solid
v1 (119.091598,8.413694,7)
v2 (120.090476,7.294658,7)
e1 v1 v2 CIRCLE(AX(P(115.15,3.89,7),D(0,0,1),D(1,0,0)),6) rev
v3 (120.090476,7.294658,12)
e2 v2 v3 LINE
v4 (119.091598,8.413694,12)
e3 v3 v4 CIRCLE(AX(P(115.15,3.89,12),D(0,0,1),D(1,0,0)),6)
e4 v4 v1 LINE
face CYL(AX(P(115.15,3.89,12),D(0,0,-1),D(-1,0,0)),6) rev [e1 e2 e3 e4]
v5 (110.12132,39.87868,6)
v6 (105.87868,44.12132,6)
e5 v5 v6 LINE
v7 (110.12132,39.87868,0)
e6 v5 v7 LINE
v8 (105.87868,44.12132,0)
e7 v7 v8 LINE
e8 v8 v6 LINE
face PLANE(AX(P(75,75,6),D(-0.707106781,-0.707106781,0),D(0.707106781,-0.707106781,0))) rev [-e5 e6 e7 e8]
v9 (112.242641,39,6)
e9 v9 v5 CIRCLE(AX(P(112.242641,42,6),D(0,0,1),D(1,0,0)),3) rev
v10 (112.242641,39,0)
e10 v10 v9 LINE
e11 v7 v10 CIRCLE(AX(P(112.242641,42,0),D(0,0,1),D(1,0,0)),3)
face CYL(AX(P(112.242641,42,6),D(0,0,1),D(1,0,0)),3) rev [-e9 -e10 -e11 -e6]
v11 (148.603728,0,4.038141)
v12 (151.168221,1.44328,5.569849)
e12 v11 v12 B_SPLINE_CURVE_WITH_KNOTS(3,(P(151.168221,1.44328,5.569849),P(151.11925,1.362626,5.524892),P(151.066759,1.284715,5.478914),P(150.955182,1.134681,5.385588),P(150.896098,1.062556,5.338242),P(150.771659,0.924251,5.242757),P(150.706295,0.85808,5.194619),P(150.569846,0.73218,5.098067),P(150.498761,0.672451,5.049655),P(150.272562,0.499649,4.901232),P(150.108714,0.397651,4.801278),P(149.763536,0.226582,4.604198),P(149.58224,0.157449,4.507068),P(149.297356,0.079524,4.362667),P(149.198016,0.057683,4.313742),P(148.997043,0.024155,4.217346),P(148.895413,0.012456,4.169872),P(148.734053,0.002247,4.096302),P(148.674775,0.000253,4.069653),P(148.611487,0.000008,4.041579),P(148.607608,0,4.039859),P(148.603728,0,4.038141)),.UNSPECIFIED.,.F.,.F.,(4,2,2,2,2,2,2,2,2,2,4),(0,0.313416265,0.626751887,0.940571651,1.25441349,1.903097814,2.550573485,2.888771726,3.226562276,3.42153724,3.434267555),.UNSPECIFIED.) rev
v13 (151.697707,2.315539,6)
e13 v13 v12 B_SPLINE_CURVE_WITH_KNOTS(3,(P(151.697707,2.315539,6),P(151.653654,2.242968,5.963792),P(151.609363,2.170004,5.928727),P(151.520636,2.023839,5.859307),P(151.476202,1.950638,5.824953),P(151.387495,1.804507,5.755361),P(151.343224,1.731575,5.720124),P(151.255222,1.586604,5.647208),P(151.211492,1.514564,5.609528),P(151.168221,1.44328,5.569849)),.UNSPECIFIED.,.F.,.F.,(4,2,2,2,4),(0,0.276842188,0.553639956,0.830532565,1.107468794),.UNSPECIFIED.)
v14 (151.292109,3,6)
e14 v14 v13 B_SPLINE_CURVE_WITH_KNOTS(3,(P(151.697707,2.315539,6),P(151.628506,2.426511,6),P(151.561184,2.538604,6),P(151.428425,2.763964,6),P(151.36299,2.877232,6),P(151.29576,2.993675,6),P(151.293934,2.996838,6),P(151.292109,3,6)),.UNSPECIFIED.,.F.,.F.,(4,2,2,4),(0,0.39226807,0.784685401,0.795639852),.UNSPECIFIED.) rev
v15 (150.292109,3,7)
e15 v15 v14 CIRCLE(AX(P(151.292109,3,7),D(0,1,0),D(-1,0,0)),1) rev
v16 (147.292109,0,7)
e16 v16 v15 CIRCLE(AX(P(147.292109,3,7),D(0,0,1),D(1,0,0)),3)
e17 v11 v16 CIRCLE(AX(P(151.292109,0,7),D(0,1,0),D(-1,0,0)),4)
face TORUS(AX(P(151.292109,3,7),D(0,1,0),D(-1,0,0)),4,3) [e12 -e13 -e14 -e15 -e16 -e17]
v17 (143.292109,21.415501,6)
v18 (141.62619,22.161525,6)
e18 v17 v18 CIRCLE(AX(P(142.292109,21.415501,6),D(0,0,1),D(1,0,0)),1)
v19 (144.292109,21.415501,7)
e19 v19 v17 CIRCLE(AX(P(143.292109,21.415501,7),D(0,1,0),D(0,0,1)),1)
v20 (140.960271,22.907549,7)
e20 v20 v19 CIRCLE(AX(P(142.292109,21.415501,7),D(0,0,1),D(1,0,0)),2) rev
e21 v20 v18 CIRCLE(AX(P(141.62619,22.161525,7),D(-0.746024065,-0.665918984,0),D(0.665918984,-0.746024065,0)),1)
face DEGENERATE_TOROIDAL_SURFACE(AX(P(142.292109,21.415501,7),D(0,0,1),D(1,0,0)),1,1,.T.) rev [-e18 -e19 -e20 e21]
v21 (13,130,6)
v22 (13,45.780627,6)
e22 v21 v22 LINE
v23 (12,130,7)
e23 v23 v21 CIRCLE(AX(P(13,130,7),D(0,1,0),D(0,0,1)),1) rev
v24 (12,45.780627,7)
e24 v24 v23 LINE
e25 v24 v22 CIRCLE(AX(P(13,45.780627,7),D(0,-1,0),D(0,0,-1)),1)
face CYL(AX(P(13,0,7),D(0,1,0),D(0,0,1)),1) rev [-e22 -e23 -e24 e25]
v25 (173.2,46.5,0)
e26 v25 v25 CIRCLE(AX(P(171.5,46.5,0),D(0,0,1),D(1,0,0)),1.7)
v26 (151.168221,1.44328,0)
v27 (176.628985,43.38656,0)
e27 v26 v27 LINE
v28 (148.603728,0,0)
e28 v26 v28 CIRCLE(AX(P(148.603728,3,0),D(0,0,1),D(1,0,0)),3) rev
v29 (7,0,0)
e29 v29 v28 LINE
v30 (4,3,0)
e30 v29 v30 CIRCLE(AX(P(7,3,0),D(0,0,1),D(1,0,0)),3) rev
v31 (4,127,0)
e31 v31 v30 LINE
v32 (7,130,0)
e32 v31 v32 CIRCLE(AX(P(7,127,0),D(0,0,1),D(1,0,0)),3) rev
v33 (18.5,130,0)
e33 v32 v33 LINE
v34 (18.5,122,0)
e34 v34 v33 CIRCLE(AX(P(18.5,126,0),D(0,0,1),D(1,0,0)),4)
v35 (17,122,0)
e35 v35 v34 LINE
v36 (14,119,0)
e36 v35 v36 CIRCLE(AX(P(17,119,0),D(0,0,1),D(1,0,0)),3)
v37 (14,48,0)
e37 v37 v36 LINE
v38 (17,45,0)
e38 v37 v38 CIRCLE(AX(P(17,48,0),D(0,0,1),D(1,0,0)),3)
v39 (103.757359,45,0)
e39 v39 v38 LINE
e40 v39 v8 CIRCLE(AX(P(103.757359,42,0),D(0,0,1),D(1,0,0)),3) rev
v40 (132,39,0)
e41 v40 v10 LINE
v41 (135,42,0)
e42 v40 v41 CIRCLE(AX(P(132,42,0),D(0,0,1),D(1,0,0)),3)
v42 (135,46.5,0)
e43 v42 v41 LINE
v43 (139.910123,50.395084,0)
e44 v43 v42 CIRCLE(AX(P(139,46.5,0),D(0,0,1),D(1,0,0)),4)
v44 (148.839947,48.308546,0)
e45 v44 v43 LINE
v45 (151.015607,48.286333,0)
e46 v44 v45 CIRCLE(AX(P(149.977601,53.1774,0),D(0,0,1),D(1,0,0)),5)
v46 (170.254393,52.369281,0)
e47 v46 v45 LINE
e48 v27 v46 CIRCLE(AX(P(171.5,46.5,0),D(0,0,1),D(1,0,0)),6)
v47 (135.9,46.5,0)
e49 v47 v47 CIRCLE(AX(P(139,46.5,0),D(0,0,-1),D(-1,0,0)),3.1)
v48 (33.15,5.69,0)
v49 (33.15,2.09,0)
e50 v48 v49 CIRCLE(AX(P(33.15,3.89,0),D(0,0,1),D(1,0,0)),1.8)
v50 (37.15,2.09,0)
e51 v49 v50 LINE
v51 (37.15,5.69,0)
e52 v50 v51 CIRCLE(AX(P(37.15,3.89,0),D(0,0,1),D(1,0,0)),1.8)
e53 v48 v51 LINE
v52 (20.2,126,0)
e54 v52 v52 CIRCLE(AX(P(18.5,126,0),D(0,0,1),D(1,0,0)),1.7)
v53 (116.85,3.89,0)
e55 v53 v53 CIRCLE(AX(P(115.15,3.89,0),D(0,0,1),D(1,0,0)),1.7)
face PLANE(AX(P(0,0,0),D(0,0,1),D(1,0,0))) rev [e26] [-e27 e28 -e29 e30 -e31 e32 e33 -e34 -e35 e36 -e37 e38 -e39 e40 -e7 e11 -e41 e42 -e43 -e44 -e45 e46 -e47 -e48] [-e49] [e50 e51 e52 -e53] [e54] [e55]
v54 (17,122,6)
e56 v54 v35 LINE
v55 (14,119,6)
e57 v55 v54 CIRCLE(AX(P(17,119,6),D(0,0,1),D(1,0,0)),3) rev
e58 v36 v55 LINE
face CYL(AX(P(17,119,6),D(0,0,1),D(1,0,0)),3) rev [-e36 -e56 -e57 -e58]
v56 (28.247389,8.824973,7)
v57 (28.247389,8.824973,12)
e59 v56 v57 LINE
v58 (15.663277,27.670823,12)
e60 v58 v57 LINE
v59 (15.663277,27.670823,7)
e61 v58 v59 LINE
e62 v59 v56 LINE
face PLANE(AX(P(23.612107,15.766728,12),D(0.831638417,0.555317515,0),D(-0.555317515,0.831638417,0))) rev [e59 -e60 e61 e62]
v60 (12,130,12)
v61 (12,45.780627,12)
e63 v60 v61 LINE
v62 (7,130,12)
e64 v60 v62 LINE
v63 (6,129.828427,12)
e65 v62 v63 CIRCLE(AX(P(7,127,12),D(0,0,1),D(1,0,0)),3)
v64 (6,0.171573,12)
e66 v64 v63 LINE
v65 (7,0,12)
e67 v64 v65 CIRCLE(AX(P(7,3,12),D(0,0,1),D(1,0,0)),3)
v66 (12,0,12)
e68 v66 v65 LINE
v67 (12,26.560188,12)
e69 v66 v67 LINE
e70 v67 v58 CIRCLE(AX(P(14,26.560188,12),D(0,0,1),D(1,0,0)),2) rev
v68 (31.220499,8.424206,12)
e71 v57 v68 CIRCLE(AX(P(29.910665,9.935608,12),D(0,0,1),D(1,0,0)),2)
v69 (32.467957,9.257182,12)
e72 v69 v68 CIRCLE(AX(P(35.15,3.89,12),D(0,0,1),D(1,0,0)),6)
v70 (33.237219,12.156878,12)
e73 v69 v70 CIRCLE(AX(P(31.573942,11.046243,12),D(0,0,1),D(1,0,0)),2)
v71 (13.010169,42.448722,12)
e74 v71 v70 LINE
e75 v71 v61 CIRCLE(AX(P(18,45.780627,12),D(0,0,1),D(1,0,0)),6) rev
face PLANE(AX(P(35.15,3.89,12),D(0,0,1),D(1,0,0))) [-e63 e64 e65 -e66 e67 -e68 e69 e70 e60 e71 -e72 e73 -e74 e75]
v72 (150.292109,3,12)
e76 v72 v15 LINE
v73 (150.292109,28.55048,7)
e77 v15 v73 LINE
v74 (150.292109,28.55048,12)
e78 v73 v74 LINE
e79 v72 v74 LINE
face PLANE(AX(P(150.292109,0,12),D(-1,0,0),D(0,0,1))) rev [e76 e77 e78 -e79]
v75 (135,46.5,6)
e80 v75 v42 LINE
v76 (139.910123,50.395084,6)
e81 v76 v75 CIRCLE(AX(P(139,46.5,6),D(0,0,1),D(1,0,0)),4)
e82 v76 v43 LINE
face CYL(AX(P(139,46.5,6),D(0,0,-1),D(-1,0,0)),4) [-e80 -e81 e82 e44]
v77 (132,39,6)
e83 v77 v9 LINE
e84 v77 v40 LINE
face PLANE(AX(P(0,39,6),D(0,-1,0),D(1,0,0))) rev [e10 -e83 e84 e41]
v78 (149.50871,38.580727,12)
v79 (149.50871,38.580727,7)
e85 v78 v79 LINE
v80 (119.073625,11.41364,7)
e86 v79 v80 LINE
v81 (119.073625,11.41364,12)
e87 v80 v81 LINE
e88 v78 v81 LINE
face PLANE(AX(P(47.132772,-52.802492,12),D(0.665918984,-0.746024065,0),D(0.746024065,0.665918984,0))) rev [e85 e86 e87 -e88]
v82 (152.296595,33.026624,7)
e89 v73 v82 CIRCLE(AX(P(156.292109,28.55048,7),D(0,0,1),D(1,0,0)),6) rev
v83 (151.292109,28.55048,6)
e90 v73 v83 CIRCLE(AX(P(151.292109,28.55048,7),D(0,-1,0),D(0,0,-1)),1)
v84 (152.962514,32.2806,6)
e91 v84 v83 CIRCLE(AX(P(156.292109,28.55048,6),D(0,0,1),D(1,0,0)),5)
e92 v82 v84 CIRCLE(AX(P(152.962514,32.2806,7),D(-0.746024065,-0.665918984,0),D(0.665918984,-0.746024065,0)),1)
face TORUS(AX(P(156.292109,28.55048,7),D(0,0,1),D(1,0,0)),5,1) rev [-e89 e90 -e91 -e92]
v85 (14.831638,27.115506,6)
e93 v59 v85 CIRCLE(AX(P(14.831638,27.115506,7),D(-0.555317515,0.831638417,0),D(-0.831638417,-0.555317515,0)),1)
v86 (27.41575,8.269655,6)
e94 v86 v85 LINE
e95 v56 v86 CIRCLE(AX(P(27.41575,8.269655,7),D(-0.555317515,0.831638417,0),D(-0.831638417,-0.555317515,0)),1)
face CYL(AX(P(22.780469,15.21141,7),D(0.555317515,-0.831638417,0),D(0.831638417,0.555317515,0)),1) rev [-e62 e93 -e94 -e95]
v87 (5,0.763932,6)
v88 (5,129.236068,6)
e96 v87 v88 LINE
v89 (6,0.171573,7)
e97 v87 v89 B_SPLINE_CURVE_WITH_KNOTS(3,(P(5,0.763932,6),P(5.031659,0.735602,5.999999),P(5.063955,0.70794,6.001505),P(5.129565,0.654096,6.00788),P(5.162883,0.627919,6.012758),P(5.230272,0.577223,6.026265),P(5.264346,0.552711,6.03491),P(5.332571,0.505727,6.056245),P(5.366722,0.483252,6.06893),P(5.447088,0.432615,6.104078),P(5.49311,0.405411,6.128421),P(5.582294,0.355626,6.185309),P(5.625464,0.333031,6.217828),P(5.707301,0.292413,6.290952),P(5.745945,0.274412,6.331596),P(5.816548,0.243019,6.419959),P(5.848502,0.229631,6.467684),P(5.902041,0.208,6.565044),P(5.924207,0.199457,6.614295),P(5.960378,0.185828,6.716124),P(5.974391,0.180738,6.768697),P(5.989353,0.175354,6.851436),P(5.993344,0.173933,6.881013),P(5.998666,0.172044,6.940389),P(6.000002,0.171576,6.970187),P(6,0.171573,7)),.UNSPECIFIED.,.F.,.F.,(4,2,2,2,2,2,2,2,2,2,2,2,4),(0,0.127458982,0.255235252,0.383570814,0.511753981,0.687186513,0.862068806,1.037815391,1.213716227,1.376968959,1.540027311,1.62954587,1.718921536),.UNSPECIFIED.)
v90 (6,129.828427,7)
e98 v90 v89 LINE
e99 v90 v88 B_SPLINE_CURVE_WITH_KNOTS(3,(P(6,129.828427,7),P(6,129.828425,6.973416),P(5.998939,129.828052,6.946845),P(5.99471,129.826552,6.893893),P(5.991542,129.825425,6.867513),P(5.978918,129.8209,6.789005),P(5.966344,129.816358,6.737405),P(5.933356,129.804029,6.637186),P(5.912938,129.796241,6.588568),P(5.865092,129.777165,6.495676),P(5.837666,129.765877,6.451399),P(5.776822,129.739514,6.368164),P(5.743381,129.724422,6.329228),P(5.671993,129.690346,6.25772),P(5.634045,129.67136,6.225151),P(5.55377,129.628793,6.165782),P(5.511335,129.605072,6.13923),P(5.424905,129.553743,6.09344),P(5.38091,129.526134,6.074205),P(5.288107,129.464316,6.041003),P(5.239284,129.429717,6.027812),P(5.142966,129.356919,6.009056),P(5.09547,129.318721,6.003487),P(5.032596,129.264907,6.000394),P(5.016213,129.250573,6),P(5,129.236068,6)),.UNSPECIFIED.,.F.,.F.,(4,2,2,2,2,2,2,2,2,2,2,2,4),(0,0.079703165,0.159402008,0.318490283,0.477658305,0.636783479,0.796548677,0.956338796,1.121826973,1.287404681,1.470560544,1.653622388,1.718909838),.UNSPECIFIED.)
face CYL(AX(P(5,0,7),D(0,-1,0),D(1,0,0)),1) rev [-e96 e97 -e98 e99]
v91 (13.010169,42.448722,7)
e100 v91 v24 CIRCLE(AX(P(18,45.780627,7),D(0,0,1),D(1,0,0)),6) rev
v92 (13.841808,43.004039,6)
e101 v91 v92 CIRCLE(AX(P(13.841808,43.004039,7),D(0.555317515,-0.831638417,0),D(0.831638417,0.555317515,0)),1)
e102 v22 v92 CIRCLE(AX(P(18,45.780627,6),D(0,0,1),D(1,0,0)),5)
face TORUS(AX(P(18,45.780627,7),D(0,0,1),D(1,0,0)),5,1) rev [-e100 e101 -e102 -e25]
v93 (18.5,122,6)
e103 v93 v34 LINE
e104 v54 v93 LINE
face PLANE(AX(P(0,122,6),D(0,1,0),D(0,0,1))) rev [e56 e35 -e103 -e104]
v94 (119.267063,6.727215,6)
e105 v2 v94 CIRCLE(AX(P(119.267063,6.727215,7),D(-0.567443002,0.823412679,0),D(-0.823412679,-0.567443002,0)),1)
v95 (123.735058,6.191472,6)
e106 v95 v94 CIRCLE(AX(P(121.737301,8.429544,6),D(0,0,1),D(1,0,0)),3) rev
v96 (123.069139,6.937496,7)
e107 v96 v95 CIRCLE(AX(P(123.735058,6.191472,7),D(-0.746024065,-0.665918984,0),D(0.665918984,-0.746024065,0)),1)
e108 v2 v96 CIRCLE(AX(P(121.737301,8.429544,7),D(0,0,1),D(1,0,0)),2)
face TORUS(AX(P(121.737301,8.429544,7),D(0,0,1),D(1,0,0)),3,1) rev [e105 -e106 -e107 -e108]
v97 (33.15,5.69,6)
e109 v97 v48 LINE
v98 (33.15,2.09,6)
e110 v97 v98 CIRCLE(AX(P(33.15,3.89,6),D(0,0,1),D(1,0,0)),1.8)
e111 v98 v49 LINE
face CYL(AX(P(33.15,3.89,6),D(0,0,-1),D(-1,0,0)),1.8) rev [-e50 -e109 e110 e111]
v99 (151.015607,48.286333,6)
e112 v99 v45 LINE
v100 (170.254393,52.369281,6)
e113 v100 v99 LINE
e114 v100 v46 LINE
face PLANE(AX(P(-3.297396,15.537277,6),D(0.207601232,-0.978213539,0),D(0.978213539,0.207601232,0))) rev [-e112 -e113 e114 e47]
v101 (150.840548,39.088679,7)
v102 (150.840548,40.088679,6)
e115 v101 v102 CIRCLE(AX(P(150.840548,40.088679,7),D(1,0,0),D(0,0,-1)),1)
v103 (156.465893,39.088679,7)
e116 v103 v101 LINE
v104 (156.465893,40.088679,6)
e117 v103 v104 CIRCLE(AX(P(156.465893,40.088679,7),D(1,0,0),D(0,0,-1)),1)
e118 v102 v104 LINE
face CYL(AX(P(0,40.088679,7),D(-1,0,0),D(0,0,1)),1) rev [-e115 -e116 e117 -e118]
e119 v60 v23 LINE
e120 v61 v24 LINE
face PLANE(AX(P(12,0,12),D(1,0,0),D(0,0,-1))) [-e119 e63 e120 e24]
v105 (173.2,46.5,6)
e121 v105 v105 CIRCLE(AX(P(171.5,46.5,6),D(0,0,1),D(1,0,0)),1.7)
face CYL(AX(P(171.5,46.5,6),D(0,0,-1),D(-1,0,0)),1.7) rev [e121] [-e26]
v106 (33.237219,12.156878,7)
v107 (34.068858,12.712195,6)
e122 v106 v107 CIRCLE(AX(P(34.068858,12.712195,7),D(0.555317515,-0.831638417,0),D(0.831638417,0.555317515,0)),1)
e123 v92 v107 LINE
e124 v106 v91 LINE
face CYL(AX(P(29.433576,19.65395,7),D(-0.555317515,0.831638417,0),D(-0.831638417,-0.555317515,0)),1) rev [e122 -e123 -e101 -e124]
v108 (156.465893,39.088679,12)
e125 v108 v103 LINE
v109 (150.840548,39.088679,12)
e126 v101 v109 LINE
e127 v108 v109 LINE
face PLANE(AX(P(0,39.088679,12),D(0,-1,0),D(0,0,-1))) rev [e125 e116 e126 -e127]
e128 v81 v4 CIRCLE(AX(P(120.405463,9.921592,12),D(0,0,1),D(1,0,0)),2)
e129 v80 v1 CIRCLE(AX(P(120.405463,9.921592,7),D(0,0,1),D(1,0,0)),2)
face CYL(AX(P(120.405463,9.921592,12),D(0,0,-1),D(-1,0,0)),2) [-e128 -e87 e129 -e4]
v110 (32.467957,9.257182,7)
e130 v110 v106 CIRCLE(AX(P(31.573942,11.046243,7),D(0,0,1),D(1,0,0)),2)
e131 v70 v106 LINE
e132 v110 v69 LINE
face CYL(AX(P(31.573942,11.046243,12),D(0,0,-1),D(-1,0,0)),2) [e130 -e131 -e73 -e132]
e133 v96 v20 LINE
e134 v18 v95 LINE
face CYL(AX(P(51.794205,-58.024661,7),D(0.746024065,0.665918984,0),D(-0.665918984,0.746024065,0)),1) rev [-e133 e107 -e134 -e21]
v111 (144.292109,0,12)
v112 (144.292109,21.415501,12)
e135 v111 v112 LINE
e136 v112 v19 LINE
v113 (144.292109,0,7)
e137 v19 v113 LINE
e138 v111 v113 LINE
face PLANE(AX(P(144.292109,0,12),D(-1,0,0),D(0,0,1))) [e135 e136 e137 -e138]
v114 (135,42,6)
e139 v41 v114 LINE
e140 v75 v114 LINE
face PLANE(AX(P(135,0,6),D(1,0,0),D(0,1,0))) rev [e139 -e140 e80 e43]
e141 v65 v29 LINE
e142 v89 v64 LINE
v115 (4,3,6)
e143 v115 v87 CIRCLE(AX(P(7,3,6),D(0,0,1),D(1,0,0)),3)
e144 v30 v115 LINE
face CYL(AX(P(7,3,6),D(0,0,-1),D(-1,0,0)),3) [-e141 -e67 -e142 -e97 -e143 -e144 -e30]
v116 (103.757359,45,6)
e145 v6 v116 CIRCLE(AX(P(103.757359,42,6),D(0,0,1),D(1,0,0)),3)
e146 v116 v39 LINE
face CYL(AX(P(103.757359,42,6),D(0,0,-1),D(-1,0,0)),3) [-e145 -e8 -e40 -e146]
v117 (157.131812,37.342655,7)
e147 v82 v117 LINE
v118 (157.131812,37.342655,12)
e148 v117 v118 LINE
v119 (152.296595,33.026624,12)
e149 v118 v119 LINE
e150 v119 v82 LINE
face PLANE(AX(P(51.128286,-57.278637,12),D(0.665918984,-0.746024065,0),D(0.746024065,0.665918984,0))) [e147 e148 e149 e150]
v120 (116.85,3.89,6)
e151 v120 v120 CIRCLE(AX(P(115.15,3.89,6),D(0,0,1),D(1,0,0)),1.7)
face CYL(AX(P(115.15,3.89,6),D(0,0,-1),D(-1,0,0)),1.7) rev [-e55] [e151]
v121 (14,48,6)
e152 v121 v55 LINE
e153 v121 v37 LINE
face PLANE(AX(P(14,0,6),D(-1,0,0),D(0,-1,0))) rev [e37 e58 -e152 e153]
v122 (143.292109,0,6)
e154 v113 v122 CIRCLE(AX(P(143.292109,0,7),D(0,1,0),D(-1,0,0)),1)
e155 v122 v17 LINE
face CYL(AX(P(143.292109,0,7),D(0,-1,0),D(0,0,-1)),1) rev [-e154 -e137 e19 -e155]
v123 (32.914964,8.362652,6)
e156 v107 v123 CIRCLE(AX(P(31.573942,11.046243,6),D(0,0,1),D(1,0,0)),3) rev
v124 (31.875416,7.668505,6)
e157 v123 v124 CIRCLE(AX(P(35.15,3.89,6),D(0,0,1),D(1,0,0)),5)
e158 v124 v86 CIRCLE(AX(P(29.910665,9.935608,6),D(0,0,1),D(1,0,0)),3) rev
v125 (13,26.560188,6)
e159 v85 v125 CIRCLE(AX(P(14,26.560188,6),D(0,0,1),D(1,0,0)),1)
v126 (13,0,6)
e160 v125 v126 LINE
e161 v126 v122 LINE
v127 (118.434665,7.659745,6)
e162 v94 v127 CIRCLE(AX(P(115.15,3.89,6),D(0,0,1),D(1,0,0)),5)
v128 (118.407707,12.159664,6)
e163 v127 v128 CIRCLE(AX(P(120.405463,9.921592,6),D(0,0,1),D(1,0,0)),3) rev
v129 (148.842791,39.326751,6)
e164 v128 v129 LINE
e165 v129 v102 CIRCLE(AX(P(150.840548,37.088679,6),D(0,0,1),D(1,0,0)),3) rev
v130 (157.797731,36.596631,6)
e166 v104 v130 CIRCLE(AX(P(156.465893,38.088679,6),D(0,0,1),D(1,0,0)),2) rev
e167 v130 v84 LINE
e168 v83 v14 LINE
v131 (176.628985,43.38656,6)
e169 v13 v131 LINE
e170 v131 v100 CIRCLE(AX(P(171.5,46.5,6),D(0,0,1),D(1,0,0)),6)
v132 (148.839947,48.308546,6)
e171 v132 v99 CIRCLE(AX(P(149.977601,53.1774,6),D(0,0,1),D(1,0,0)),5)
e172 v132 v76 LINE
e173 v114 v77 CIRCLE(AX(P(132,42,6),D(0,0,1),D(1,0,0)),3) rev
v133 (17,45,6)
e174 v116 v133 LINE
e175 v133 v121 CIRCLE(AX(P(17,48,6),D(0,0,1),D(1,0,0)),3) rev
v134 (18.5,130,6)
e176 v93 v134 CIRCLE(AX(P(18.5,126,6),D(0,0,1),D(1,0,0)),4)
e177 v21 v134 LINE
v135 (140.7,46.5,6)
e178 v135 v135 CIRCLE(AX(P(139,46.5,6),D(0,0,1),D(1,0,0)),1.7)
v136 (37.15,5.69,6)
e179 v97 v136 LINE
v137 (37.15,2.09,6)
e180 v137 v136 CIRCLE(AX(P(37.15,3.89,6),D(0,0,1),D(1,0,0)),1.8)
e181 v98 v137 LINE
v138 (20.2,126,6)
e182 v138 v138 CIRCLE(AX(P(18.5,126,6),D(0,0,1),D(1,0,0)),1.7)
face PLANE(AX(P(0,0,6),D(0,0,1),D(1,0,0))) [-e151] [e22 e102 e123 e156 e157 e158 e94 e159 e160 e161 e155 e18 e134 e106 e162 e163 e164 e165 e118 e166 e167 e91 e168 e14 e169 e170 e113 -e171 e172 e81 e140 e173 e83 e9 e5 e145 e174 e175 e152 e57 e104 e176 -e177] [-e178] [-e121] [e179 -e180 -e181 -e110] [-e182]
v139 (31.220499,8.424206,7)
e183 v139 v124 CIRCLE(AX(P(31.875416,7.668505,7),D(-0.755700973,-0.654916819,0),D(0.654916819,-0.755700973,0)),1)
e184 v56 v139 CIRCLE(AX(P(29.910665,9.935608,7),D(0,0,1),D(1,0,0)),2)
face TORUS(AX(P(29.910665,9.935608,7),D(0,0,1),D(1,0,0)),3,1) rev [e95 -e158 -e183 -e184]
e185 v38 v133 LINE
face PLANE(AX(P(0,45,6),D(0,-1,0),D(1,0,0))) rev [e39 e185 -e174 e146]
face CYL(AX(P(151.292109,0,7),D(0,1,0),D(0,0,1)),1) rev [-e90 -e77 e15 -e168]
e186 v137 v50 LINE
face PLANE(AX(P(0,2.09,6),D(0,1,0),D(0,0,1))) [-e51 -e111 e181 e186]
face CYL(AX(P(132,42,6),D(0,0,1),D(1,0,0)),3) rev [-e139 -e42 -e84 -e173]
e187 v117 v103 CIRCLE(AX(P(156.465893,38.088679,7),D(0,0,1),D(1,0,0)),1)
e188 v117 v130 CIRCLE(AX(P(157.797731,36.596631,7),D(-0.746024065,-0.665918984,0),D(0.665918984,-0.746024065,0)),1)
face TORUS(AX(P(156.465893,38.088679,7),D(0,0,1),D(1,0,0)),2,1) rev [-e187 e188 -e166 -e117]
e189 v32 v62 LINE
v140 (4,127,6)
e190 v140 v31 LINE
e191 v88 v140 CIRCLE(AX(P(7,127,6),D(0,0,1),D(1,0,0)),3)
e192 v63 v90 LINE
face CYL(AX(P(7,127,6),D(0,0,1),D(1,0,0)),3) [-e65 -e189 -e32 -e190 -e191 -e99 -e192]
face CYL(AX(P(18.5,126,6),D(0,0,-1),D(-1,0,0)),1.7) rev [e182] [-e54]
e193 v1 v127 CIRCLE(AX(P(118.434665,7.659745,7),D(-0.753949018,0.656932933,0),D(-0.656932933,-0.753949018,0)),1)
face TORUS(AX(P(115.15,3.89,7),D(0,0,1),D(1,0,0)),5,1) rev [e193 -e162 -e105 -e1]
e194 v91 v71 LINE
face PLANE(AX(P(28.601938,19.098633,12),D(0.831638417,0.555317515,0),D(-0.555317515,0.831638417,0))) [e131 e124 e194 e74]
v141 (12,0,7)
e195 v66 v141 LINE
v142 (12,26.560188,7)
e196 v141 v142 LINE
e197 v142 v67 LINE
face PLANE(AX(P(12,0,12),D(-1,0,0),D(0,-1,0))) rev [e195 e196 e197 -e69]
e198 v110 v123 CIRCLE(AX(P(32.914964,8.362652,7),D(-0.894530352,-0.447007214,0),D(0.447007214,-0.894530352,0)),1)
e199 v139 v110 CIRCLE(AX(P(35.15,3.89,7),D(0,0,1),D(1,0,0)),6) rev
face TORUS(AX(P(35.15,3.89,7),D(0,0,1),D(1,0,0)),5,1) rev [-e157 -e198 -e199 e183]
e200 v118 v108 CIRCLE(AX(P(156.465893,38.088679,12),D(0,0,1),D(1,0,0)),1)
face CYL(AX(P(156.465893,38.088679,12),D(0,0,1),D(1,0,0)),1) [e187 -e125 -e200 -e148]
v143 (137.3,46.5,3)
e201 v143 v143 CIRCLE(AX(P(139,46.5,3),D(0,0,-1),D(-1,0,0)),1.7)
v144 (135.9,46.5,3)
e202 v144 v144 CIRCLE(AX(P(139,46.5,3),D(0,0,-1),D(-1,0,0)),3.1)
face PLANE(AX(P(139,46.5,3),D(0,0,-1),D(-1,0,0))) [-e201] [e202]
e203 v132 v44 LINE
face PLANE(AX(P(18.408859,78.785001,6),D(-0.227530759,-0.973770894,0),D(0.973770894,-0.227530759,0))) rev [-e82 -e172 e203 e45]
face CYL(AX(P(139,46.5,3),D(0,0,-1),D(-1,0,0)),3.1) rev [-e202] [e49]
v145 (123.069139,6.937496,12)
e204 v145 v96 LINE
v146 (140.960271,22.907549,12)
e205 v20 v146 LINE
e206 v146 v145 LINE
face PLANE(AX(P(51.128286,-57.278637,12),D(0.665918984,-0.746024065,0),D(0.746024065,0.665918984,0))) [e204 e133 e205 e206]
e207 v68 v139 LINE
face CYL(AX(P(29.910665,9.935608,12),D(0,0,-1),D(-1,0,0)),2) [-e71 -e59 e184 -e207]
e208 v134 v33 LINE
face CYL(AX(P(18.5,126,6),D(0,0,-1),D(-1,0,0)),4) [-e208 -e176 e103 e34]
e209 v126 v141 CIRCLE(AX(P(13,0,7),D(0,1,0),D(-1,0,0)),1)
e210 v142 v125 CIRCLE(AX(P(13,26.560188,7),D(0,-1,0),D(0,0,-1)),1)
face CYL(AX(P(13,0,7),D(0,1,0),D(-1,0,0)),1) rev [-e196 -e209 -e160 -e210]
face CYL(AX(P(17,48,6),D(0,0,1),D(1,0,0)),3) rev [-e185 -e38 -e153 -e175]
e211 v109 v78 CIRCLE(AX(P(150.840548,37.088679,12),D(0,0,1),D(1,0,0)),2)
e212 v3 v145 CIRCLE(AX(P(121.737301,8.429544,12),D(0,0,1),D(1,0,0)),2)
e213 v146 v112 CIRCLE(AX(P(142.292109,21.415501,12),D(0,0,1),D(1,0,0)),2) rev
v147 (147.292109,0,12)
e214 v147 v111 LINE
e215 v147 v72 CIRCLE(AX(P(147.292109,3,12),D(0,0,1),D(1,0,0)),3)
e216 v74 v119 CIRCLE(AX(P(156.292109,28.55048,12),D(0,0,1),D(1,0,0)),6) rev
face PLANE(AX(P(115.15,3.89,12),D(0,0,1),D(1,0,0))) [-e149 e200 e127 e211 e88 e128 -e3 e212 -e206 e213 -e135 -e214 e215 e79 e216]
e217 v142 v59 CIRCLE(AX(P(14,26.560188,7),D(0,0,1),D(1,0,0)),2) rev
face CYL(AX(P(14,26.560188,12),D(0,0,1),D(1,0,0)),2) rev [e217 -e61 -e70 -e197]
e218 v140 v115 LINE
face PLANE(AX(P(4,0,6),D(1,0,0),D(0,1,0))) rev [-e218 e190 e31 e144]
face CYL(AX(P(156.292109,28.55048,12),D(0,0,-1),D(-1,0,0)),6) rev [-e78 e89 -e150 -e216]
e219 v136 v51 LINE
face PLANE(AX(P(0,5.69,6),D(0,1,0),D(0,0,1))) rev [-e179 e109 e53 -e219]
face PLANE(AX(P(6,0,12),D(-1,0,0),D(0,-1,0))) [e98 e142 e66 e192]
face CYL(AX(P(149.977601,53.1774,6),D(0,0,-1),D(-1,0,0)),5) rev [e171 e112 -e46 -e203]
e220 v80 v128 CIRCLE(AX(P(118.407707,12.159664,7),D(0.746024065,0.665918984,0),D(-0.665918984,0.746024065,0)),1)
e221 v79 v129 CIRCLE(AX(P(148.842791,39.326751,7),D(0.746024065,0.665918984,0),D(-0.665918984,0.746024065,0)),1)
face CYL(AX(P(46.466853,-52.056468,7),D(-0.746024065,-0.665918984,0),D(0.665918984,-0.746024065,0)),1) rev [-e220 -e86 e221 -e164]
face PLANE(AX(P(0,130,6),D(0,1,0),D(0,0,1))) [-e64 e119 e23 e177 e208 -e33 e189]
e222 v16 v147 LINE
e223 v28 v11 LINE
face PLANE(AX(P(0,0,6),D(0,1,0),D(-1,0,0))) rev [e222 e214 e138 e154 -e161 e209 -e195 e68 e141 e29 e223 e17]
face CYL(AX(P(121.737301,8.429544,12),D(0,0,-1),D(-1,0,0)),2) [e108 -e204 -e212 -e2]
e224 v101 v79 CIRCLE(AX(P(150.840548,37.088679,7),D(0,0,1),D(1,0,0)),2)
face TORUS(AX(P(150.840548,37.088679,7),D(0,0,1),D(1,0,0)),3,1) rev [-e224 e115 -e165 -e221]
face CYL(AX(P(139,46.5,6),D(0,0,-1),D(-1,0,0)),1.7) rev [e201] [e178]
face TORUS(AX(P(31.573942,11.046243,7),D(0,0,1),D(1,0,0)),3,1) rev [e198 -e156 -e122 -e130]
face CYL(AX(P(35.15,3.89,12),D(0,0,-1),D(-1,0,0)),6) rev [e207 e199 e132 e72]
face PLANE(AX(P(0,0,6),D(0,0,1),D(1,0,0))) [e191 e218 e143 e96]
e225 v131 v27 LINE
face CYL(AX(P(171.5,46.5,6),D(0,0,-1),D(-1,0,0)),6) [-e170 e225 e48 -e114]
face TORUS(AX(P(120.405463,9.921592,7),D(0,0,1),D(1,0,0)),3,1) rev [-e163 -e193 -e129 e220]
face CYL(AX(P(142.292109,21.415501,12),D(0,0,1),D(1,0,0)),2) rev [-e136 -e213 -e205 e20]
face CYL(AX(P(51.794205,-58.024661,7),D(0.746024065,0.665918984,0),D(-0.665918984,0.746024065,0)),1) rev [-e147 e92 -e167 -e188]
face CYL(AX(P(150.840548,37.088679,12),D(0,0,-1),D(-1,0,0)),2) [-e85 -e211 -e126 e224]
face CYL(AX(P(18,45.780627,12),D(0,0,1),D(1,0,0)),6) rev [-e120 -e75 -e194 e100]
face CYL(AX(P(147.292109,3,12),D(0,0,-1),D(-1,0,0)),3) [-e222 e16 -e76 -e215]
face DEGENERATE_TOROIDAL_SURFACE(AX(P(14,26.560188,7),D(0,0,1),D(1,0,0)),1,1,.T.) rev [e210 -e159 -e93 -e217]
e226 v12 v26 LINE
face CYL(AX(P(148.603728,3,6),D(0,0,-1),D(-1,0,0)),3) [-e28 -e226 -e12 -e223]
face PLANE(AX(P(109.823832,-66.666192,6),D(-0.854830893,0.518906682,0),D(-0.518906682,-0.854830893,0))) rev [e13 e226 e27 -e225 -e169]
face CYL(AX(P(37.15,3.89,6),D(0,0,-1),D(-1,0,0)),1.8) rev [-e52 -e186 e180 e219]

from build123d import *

# Parameters (mm, degrees)
SKETCH1_R           = 1.7
BOSS_EXTRUDE1_DEPTH = 6
BOSS_EXTRUDE2_START = 6
BOSS_EXTRUDE2_DEPTH = 6
SKETCH2_R           = 3.1
CUT_EXTRUDE1_DEPTH  = 3
FILLET1_R           = 2
FILLET2_R           = 6
FILLET3_R           = 1
FILLET4_R           = 1
FILLET5_DEPTH       = 6
FILLET5_START       = -1
FILLET5_3_DEPTH     = 13
FILLET5_START_2     = 6.9999999
FILLET5_4_DEPTH     = 5.0000001
FILLET5_5_DEPTH     = 6


with BuildPart() as part:
    # Sketch1 → Boss-Extrude1 (new body)
    with BuildSketch(Plane.XY):
        with BuildLine():
            Line((4, 0), (150.292108611, 0))
            Line((150.292108611, 0), (176.628985356, 43.386559906))
            ThreePointArc((176.628985356, 43.386559906), (176.393105018, 49.97239446), (170.254392606, 52.369281235))
            Line((170.254392606, 52.369281235), (151.015607145, 48.286332665))
            ThreePointArc((151.015607145, 48.286332665), (149.926554244, 48.177660945), (148.839947189, 48.308545892))
            Line((148.839947189, 48.308545892), (139.910123035, 50.395083576))
            ThreePointArc((139.910123035, 50.395083576), (136.514088914, 49.633727185), (135, 46.5))
            Line((135, 46.5), (135, 39))
            Line((135, 39), (111, 39))
            Line((111, 39), (105, 45))
            Line((105, 45), (14, 45))
            Line((14, 45), (14, 122))
            Line((14, 122), (18.5, 122))
            ThreePointArc((18.5, 122), (22.5, 126), (18.5, 130))
            Line((18.5, 130), (4, 130))
            Line((4, 130), (4, 0))
        make_face()
        with BuildLine():
            Line((33.15, 5.69), (37.15, 5.69))
            ThreePointArc((37.15, 5.69), (38.95, 3.89), (37.15, 2.09))
            Line((37.15, 2.09), (33.15, 2.09))
            ThreePointArc((33.15, 2.09), (31.35, 3.89), (33.15, 5.69))
        make_face(mode=Mode.SUBTRACT)
        with Locations((115.15, 3.89)):
            Circle(SKETCH1_R, mode=Mode.SUBTRACT)
        with Locations((171.5, 46.5)):
            Circle(SKETCH1_R, mode=Mode.SUBTRACT)
        with Locations((18.5, 126)):
            Circle(SKETCH1_R, mode=Mode.SUBTRACT)
        with Locations((139, 46.5)):
            Circle(SKETCH1_R, mode=Mode.SUBTRACT)
    extrude(amount=BOSS_EXTRUDE1_DEPTH)

    # Sketch1<3> → Boss-Extrude2 (add)
    with BuildSketch(Plane.XY.offset(BOSS_EXTRUDE2_START)):
        with BuildLine():
            Line((12, 33.156912913), (29.769570295, 6.545367431))
            ThreePointArc((29.769570295, 6.545367431), (31.818094908, 8.879830504), (34.759400799, 9.877272523))
            Line((34.759400799, 9.877272523), (12, 43.961542399))
            Line((12, 43.961542399), (12, 130))
            Line((12, 130), (6, 130))
            Line((6, 130), (6, 0))
            Line((6, 0), (12, 0))
            Line((12, 0), (12, 33.156912913))
        make_face()
        with BuildLine():
            ThreePointArc((117.028697802, 9.58828874), (119.626144393, 7.885513906), (121.024211708, 5.112144348))
            Line((121.024211708, 5.112144348), (144.292108611, 25.881627522))
            Line((144.292108611, 25.881627522), (144.292108611, 0))
            Line((144.292108611, 0), (150.292108611, 0))
            Line((150.292108611, 0), (150.292108611, 31.237371514))
            Line((150.292108611, 31.237371514), (159.087870064, 39.088679274))
            Line((159.087870064, 39.088679274), (150.077765021, 39.088679274))
            Line((150.077765021, 39.088679274), (117.028697802, 9.58828874))
        make_face()
    extrude(amount=BOSS_EXTRUDE2_DEPTH)

    # Sketch2 → Cut-Extrude1 (cut)
    with BuildSketch(Plane(origin=(0, 0, 0), x_dir=(-1, 0, 0), z_dir=(0, 0, -1))):
        with Locations((-139, 46.5)):
            Circle(SKETCH2_R)
    extrude(amount=-CUT_EXTRUDE1_DEPTH, mode=Mode.SUBTRACT)

    # Fillet1
    fillet1_edges = [part.edges().sort_by_distance(p)[0] for p in [
        (150.077765021, 39.088679274, 9),
        (117.028697802, 9.58828874, 9),
        (121.024211708, 5.112144348, 9),
        (144.292108611, 25.881627522, 9),
        (12, 33.156912913, 9),
        (29.769570295, 6.545367431, 9),
        (34.759400799, 9.877272523, 9),
    ]]
    fillet(fillet1_edges, radius=FILLET1_R)

    # Fillet2
    fillet2_edges = [part.edges().sort_by_distance(p)[0] for p in [
        (150.292108611, 31.237371514, 9),
        (12, 43.961542399, 9),
    ]]
    fillet(fillet2_edges, radius=FILLET2_R)

    # Fillet3
    fillet3_edges = [part.edges().sort_by_distance(p)[0] for p in [
        (159.087870064, 39.088679274, 9),
    ]]
    fillet(fillet3_edges, radius=FILLET3_R)

    # Fillet4
    fillet4_edges = [part.edges().sort_by_distance(p)[0] for p in [
        (150.292108611, 14.275239757, 6),
        (144.292108611, 10.70775043, 6),
        (31.818094908, 8.879830504, 6),
        (21.955332725, 18.24789794, 6),
        (132.014705022, 14.922522436, 6),
        (119.626144393, 7.885513906, 6),
        (134.291167915, 24.997183839, 6),
        (143.109520399, 23.24083315, 6),
        (13.419721476, 28.474156966, 6),
        (29.643487506, 7.953534135, 6),
        (33.507072774, 10.53340121, 6),
        (121.499193347, 6.443768461, 6),
        (118.405499352, 9.909610742, 6),
        (150.127840882, 38.957381532, 6),
        (23.123694308, 27.302799836, 6),
        (150.816111741, 31.002714877, 6),
        (12.258093391, 44.039791347, 6),
        (153.653220831, 39.088679274, 6),
        (154.714203524, 35.184639557, 6),
        (157.400244487, 38.445032985, 6),
        (12, 13.280094048, 6),
        (12, 87.89031346, 6),
        (6, 65, 6),
    ]]
    fillet(fillet4_edges, radius=FILLET4_R)

    # Fillet5: read off the stored shape, not the designer's step
    # Fillet5 outline → Fillet5 (add)
    with BuildSketch(Plane.XY):
        with BuildLine():
            ThreePointArc((135, 42), (134.121320344, 39.878679656), (132, 39))
            Line((132, 39), (135, 39))
            Line((135, 39), (135, 42))
        make_face()
        with BuildLine():
            ThreePointArc((112.242640687, 39), (111.09459039, 39.228361402), (110.121320344, 39.878679656))
            Line((110.121320344, 39.878679656), (111, 39))
            Line((111, 39), (112.242640687, 39))
        make_face()
    extrude(amount=FILLET5_DEPTH)

    # Fillet5 2 outline → Fillet5 2 (revolve, cut)
    with BuildSketch(Plane(origin=(151.292108611, 0, 7), x_dir=(1, 0, 0), z_dir=(0, 0, 1))):
        with BuildLine():
            ThreePointArc((4, 0), (1.878679656, 0.878679656), (1, 3))
            Line((1, 3), (1, 0))
            Line((1, 0), (4, 0))
        make_face()
    revolve(axis=Axis((151.292108611, 0, 7), (0, 1, 0)), mode=Mode.SUBTRACT)

    # Fillet5 3 outline → Fillet5 3 (cut)
    with BuildSketch(Plane.XY.offset(FILLET5_START)):
        with BuildLine():
            Line((150.292108611, 0), (151.168220622, 1.443279953))
            ThreePointArc((151.168220622, 1.443279953), (150.075094632, 0.385601394), (148.603727944, 0))
            Line((148.603727944, 0), (150.292108611, 0))
        make_face()
        with BuildLine():
            ThreePointArc((7, 0), (4.878679656, 0.878679656), (4, 3))
            Line((4, 3), (4, 0))
            Line((4, 0), (7, 0))
        make_face()
        with BuildLine():
            Line((7, 130), (4, 130))
            Line((4, 130), (4, 127))
            ThreePointArc((4, 127), (4.878679656, 129.121320344), (7, 130))
        make_face()
        with BuildLine():
            Line((105, 45), (103.757359313, 45))
            ThreePointArc((103.757359313, 45), (104.90540961, 44.771638598), (105.878679656, 44.121320344))
            Line((105.878679656, 44.121320344), (105, 45))
        make_face()
    extrude(amount=FILLET5_3_DEPTH, mode=Mode.SUBTRACT)

    # Fillet5 4 outline → Fillet5 4 (cut)
    with BuildSketch(Plane.XY.offset(FILLET5_START_2)):
        with BuildLine():
            ThreePointArc((148.603727944, 0), (149.487080244, 0.13300005), (150.292108611, 0.520207524))
            Line((150.292108611, 0.520207524), (150.292108611, 3))
            ThreePointArc((150.292108611, 3), (149.413428955, 0.878679656), (147.292108611, 0))
            Line((147.292108611, 0), (148.603727944, 0))
        make_face()
    extrude(amount=FILLET5_4_DEPTH, mode=Mode.SUBTRACT)

    # Fillet5 5 outline → Fillet5 5 (add)
    with BuildSketch(Plane.XY):
        with BuildLine():
            ThreePointArc((17, 45), (14.878679656, 45.878679656), (14, 48))
            Line((14, 48), (14, 45))
            Line((14, 45), (17, 45))
        make_face()
        with BuildLine():
            ThreePointArc((14, 119), (14.878679656, 121.121320344), (17, 122))
            Line((17, 122), (14, 122))
            Line((14, 122), (14, 119))
        make_face()
    extrude(amount=FILLET5_5_DEPTH)


solid = part.part
